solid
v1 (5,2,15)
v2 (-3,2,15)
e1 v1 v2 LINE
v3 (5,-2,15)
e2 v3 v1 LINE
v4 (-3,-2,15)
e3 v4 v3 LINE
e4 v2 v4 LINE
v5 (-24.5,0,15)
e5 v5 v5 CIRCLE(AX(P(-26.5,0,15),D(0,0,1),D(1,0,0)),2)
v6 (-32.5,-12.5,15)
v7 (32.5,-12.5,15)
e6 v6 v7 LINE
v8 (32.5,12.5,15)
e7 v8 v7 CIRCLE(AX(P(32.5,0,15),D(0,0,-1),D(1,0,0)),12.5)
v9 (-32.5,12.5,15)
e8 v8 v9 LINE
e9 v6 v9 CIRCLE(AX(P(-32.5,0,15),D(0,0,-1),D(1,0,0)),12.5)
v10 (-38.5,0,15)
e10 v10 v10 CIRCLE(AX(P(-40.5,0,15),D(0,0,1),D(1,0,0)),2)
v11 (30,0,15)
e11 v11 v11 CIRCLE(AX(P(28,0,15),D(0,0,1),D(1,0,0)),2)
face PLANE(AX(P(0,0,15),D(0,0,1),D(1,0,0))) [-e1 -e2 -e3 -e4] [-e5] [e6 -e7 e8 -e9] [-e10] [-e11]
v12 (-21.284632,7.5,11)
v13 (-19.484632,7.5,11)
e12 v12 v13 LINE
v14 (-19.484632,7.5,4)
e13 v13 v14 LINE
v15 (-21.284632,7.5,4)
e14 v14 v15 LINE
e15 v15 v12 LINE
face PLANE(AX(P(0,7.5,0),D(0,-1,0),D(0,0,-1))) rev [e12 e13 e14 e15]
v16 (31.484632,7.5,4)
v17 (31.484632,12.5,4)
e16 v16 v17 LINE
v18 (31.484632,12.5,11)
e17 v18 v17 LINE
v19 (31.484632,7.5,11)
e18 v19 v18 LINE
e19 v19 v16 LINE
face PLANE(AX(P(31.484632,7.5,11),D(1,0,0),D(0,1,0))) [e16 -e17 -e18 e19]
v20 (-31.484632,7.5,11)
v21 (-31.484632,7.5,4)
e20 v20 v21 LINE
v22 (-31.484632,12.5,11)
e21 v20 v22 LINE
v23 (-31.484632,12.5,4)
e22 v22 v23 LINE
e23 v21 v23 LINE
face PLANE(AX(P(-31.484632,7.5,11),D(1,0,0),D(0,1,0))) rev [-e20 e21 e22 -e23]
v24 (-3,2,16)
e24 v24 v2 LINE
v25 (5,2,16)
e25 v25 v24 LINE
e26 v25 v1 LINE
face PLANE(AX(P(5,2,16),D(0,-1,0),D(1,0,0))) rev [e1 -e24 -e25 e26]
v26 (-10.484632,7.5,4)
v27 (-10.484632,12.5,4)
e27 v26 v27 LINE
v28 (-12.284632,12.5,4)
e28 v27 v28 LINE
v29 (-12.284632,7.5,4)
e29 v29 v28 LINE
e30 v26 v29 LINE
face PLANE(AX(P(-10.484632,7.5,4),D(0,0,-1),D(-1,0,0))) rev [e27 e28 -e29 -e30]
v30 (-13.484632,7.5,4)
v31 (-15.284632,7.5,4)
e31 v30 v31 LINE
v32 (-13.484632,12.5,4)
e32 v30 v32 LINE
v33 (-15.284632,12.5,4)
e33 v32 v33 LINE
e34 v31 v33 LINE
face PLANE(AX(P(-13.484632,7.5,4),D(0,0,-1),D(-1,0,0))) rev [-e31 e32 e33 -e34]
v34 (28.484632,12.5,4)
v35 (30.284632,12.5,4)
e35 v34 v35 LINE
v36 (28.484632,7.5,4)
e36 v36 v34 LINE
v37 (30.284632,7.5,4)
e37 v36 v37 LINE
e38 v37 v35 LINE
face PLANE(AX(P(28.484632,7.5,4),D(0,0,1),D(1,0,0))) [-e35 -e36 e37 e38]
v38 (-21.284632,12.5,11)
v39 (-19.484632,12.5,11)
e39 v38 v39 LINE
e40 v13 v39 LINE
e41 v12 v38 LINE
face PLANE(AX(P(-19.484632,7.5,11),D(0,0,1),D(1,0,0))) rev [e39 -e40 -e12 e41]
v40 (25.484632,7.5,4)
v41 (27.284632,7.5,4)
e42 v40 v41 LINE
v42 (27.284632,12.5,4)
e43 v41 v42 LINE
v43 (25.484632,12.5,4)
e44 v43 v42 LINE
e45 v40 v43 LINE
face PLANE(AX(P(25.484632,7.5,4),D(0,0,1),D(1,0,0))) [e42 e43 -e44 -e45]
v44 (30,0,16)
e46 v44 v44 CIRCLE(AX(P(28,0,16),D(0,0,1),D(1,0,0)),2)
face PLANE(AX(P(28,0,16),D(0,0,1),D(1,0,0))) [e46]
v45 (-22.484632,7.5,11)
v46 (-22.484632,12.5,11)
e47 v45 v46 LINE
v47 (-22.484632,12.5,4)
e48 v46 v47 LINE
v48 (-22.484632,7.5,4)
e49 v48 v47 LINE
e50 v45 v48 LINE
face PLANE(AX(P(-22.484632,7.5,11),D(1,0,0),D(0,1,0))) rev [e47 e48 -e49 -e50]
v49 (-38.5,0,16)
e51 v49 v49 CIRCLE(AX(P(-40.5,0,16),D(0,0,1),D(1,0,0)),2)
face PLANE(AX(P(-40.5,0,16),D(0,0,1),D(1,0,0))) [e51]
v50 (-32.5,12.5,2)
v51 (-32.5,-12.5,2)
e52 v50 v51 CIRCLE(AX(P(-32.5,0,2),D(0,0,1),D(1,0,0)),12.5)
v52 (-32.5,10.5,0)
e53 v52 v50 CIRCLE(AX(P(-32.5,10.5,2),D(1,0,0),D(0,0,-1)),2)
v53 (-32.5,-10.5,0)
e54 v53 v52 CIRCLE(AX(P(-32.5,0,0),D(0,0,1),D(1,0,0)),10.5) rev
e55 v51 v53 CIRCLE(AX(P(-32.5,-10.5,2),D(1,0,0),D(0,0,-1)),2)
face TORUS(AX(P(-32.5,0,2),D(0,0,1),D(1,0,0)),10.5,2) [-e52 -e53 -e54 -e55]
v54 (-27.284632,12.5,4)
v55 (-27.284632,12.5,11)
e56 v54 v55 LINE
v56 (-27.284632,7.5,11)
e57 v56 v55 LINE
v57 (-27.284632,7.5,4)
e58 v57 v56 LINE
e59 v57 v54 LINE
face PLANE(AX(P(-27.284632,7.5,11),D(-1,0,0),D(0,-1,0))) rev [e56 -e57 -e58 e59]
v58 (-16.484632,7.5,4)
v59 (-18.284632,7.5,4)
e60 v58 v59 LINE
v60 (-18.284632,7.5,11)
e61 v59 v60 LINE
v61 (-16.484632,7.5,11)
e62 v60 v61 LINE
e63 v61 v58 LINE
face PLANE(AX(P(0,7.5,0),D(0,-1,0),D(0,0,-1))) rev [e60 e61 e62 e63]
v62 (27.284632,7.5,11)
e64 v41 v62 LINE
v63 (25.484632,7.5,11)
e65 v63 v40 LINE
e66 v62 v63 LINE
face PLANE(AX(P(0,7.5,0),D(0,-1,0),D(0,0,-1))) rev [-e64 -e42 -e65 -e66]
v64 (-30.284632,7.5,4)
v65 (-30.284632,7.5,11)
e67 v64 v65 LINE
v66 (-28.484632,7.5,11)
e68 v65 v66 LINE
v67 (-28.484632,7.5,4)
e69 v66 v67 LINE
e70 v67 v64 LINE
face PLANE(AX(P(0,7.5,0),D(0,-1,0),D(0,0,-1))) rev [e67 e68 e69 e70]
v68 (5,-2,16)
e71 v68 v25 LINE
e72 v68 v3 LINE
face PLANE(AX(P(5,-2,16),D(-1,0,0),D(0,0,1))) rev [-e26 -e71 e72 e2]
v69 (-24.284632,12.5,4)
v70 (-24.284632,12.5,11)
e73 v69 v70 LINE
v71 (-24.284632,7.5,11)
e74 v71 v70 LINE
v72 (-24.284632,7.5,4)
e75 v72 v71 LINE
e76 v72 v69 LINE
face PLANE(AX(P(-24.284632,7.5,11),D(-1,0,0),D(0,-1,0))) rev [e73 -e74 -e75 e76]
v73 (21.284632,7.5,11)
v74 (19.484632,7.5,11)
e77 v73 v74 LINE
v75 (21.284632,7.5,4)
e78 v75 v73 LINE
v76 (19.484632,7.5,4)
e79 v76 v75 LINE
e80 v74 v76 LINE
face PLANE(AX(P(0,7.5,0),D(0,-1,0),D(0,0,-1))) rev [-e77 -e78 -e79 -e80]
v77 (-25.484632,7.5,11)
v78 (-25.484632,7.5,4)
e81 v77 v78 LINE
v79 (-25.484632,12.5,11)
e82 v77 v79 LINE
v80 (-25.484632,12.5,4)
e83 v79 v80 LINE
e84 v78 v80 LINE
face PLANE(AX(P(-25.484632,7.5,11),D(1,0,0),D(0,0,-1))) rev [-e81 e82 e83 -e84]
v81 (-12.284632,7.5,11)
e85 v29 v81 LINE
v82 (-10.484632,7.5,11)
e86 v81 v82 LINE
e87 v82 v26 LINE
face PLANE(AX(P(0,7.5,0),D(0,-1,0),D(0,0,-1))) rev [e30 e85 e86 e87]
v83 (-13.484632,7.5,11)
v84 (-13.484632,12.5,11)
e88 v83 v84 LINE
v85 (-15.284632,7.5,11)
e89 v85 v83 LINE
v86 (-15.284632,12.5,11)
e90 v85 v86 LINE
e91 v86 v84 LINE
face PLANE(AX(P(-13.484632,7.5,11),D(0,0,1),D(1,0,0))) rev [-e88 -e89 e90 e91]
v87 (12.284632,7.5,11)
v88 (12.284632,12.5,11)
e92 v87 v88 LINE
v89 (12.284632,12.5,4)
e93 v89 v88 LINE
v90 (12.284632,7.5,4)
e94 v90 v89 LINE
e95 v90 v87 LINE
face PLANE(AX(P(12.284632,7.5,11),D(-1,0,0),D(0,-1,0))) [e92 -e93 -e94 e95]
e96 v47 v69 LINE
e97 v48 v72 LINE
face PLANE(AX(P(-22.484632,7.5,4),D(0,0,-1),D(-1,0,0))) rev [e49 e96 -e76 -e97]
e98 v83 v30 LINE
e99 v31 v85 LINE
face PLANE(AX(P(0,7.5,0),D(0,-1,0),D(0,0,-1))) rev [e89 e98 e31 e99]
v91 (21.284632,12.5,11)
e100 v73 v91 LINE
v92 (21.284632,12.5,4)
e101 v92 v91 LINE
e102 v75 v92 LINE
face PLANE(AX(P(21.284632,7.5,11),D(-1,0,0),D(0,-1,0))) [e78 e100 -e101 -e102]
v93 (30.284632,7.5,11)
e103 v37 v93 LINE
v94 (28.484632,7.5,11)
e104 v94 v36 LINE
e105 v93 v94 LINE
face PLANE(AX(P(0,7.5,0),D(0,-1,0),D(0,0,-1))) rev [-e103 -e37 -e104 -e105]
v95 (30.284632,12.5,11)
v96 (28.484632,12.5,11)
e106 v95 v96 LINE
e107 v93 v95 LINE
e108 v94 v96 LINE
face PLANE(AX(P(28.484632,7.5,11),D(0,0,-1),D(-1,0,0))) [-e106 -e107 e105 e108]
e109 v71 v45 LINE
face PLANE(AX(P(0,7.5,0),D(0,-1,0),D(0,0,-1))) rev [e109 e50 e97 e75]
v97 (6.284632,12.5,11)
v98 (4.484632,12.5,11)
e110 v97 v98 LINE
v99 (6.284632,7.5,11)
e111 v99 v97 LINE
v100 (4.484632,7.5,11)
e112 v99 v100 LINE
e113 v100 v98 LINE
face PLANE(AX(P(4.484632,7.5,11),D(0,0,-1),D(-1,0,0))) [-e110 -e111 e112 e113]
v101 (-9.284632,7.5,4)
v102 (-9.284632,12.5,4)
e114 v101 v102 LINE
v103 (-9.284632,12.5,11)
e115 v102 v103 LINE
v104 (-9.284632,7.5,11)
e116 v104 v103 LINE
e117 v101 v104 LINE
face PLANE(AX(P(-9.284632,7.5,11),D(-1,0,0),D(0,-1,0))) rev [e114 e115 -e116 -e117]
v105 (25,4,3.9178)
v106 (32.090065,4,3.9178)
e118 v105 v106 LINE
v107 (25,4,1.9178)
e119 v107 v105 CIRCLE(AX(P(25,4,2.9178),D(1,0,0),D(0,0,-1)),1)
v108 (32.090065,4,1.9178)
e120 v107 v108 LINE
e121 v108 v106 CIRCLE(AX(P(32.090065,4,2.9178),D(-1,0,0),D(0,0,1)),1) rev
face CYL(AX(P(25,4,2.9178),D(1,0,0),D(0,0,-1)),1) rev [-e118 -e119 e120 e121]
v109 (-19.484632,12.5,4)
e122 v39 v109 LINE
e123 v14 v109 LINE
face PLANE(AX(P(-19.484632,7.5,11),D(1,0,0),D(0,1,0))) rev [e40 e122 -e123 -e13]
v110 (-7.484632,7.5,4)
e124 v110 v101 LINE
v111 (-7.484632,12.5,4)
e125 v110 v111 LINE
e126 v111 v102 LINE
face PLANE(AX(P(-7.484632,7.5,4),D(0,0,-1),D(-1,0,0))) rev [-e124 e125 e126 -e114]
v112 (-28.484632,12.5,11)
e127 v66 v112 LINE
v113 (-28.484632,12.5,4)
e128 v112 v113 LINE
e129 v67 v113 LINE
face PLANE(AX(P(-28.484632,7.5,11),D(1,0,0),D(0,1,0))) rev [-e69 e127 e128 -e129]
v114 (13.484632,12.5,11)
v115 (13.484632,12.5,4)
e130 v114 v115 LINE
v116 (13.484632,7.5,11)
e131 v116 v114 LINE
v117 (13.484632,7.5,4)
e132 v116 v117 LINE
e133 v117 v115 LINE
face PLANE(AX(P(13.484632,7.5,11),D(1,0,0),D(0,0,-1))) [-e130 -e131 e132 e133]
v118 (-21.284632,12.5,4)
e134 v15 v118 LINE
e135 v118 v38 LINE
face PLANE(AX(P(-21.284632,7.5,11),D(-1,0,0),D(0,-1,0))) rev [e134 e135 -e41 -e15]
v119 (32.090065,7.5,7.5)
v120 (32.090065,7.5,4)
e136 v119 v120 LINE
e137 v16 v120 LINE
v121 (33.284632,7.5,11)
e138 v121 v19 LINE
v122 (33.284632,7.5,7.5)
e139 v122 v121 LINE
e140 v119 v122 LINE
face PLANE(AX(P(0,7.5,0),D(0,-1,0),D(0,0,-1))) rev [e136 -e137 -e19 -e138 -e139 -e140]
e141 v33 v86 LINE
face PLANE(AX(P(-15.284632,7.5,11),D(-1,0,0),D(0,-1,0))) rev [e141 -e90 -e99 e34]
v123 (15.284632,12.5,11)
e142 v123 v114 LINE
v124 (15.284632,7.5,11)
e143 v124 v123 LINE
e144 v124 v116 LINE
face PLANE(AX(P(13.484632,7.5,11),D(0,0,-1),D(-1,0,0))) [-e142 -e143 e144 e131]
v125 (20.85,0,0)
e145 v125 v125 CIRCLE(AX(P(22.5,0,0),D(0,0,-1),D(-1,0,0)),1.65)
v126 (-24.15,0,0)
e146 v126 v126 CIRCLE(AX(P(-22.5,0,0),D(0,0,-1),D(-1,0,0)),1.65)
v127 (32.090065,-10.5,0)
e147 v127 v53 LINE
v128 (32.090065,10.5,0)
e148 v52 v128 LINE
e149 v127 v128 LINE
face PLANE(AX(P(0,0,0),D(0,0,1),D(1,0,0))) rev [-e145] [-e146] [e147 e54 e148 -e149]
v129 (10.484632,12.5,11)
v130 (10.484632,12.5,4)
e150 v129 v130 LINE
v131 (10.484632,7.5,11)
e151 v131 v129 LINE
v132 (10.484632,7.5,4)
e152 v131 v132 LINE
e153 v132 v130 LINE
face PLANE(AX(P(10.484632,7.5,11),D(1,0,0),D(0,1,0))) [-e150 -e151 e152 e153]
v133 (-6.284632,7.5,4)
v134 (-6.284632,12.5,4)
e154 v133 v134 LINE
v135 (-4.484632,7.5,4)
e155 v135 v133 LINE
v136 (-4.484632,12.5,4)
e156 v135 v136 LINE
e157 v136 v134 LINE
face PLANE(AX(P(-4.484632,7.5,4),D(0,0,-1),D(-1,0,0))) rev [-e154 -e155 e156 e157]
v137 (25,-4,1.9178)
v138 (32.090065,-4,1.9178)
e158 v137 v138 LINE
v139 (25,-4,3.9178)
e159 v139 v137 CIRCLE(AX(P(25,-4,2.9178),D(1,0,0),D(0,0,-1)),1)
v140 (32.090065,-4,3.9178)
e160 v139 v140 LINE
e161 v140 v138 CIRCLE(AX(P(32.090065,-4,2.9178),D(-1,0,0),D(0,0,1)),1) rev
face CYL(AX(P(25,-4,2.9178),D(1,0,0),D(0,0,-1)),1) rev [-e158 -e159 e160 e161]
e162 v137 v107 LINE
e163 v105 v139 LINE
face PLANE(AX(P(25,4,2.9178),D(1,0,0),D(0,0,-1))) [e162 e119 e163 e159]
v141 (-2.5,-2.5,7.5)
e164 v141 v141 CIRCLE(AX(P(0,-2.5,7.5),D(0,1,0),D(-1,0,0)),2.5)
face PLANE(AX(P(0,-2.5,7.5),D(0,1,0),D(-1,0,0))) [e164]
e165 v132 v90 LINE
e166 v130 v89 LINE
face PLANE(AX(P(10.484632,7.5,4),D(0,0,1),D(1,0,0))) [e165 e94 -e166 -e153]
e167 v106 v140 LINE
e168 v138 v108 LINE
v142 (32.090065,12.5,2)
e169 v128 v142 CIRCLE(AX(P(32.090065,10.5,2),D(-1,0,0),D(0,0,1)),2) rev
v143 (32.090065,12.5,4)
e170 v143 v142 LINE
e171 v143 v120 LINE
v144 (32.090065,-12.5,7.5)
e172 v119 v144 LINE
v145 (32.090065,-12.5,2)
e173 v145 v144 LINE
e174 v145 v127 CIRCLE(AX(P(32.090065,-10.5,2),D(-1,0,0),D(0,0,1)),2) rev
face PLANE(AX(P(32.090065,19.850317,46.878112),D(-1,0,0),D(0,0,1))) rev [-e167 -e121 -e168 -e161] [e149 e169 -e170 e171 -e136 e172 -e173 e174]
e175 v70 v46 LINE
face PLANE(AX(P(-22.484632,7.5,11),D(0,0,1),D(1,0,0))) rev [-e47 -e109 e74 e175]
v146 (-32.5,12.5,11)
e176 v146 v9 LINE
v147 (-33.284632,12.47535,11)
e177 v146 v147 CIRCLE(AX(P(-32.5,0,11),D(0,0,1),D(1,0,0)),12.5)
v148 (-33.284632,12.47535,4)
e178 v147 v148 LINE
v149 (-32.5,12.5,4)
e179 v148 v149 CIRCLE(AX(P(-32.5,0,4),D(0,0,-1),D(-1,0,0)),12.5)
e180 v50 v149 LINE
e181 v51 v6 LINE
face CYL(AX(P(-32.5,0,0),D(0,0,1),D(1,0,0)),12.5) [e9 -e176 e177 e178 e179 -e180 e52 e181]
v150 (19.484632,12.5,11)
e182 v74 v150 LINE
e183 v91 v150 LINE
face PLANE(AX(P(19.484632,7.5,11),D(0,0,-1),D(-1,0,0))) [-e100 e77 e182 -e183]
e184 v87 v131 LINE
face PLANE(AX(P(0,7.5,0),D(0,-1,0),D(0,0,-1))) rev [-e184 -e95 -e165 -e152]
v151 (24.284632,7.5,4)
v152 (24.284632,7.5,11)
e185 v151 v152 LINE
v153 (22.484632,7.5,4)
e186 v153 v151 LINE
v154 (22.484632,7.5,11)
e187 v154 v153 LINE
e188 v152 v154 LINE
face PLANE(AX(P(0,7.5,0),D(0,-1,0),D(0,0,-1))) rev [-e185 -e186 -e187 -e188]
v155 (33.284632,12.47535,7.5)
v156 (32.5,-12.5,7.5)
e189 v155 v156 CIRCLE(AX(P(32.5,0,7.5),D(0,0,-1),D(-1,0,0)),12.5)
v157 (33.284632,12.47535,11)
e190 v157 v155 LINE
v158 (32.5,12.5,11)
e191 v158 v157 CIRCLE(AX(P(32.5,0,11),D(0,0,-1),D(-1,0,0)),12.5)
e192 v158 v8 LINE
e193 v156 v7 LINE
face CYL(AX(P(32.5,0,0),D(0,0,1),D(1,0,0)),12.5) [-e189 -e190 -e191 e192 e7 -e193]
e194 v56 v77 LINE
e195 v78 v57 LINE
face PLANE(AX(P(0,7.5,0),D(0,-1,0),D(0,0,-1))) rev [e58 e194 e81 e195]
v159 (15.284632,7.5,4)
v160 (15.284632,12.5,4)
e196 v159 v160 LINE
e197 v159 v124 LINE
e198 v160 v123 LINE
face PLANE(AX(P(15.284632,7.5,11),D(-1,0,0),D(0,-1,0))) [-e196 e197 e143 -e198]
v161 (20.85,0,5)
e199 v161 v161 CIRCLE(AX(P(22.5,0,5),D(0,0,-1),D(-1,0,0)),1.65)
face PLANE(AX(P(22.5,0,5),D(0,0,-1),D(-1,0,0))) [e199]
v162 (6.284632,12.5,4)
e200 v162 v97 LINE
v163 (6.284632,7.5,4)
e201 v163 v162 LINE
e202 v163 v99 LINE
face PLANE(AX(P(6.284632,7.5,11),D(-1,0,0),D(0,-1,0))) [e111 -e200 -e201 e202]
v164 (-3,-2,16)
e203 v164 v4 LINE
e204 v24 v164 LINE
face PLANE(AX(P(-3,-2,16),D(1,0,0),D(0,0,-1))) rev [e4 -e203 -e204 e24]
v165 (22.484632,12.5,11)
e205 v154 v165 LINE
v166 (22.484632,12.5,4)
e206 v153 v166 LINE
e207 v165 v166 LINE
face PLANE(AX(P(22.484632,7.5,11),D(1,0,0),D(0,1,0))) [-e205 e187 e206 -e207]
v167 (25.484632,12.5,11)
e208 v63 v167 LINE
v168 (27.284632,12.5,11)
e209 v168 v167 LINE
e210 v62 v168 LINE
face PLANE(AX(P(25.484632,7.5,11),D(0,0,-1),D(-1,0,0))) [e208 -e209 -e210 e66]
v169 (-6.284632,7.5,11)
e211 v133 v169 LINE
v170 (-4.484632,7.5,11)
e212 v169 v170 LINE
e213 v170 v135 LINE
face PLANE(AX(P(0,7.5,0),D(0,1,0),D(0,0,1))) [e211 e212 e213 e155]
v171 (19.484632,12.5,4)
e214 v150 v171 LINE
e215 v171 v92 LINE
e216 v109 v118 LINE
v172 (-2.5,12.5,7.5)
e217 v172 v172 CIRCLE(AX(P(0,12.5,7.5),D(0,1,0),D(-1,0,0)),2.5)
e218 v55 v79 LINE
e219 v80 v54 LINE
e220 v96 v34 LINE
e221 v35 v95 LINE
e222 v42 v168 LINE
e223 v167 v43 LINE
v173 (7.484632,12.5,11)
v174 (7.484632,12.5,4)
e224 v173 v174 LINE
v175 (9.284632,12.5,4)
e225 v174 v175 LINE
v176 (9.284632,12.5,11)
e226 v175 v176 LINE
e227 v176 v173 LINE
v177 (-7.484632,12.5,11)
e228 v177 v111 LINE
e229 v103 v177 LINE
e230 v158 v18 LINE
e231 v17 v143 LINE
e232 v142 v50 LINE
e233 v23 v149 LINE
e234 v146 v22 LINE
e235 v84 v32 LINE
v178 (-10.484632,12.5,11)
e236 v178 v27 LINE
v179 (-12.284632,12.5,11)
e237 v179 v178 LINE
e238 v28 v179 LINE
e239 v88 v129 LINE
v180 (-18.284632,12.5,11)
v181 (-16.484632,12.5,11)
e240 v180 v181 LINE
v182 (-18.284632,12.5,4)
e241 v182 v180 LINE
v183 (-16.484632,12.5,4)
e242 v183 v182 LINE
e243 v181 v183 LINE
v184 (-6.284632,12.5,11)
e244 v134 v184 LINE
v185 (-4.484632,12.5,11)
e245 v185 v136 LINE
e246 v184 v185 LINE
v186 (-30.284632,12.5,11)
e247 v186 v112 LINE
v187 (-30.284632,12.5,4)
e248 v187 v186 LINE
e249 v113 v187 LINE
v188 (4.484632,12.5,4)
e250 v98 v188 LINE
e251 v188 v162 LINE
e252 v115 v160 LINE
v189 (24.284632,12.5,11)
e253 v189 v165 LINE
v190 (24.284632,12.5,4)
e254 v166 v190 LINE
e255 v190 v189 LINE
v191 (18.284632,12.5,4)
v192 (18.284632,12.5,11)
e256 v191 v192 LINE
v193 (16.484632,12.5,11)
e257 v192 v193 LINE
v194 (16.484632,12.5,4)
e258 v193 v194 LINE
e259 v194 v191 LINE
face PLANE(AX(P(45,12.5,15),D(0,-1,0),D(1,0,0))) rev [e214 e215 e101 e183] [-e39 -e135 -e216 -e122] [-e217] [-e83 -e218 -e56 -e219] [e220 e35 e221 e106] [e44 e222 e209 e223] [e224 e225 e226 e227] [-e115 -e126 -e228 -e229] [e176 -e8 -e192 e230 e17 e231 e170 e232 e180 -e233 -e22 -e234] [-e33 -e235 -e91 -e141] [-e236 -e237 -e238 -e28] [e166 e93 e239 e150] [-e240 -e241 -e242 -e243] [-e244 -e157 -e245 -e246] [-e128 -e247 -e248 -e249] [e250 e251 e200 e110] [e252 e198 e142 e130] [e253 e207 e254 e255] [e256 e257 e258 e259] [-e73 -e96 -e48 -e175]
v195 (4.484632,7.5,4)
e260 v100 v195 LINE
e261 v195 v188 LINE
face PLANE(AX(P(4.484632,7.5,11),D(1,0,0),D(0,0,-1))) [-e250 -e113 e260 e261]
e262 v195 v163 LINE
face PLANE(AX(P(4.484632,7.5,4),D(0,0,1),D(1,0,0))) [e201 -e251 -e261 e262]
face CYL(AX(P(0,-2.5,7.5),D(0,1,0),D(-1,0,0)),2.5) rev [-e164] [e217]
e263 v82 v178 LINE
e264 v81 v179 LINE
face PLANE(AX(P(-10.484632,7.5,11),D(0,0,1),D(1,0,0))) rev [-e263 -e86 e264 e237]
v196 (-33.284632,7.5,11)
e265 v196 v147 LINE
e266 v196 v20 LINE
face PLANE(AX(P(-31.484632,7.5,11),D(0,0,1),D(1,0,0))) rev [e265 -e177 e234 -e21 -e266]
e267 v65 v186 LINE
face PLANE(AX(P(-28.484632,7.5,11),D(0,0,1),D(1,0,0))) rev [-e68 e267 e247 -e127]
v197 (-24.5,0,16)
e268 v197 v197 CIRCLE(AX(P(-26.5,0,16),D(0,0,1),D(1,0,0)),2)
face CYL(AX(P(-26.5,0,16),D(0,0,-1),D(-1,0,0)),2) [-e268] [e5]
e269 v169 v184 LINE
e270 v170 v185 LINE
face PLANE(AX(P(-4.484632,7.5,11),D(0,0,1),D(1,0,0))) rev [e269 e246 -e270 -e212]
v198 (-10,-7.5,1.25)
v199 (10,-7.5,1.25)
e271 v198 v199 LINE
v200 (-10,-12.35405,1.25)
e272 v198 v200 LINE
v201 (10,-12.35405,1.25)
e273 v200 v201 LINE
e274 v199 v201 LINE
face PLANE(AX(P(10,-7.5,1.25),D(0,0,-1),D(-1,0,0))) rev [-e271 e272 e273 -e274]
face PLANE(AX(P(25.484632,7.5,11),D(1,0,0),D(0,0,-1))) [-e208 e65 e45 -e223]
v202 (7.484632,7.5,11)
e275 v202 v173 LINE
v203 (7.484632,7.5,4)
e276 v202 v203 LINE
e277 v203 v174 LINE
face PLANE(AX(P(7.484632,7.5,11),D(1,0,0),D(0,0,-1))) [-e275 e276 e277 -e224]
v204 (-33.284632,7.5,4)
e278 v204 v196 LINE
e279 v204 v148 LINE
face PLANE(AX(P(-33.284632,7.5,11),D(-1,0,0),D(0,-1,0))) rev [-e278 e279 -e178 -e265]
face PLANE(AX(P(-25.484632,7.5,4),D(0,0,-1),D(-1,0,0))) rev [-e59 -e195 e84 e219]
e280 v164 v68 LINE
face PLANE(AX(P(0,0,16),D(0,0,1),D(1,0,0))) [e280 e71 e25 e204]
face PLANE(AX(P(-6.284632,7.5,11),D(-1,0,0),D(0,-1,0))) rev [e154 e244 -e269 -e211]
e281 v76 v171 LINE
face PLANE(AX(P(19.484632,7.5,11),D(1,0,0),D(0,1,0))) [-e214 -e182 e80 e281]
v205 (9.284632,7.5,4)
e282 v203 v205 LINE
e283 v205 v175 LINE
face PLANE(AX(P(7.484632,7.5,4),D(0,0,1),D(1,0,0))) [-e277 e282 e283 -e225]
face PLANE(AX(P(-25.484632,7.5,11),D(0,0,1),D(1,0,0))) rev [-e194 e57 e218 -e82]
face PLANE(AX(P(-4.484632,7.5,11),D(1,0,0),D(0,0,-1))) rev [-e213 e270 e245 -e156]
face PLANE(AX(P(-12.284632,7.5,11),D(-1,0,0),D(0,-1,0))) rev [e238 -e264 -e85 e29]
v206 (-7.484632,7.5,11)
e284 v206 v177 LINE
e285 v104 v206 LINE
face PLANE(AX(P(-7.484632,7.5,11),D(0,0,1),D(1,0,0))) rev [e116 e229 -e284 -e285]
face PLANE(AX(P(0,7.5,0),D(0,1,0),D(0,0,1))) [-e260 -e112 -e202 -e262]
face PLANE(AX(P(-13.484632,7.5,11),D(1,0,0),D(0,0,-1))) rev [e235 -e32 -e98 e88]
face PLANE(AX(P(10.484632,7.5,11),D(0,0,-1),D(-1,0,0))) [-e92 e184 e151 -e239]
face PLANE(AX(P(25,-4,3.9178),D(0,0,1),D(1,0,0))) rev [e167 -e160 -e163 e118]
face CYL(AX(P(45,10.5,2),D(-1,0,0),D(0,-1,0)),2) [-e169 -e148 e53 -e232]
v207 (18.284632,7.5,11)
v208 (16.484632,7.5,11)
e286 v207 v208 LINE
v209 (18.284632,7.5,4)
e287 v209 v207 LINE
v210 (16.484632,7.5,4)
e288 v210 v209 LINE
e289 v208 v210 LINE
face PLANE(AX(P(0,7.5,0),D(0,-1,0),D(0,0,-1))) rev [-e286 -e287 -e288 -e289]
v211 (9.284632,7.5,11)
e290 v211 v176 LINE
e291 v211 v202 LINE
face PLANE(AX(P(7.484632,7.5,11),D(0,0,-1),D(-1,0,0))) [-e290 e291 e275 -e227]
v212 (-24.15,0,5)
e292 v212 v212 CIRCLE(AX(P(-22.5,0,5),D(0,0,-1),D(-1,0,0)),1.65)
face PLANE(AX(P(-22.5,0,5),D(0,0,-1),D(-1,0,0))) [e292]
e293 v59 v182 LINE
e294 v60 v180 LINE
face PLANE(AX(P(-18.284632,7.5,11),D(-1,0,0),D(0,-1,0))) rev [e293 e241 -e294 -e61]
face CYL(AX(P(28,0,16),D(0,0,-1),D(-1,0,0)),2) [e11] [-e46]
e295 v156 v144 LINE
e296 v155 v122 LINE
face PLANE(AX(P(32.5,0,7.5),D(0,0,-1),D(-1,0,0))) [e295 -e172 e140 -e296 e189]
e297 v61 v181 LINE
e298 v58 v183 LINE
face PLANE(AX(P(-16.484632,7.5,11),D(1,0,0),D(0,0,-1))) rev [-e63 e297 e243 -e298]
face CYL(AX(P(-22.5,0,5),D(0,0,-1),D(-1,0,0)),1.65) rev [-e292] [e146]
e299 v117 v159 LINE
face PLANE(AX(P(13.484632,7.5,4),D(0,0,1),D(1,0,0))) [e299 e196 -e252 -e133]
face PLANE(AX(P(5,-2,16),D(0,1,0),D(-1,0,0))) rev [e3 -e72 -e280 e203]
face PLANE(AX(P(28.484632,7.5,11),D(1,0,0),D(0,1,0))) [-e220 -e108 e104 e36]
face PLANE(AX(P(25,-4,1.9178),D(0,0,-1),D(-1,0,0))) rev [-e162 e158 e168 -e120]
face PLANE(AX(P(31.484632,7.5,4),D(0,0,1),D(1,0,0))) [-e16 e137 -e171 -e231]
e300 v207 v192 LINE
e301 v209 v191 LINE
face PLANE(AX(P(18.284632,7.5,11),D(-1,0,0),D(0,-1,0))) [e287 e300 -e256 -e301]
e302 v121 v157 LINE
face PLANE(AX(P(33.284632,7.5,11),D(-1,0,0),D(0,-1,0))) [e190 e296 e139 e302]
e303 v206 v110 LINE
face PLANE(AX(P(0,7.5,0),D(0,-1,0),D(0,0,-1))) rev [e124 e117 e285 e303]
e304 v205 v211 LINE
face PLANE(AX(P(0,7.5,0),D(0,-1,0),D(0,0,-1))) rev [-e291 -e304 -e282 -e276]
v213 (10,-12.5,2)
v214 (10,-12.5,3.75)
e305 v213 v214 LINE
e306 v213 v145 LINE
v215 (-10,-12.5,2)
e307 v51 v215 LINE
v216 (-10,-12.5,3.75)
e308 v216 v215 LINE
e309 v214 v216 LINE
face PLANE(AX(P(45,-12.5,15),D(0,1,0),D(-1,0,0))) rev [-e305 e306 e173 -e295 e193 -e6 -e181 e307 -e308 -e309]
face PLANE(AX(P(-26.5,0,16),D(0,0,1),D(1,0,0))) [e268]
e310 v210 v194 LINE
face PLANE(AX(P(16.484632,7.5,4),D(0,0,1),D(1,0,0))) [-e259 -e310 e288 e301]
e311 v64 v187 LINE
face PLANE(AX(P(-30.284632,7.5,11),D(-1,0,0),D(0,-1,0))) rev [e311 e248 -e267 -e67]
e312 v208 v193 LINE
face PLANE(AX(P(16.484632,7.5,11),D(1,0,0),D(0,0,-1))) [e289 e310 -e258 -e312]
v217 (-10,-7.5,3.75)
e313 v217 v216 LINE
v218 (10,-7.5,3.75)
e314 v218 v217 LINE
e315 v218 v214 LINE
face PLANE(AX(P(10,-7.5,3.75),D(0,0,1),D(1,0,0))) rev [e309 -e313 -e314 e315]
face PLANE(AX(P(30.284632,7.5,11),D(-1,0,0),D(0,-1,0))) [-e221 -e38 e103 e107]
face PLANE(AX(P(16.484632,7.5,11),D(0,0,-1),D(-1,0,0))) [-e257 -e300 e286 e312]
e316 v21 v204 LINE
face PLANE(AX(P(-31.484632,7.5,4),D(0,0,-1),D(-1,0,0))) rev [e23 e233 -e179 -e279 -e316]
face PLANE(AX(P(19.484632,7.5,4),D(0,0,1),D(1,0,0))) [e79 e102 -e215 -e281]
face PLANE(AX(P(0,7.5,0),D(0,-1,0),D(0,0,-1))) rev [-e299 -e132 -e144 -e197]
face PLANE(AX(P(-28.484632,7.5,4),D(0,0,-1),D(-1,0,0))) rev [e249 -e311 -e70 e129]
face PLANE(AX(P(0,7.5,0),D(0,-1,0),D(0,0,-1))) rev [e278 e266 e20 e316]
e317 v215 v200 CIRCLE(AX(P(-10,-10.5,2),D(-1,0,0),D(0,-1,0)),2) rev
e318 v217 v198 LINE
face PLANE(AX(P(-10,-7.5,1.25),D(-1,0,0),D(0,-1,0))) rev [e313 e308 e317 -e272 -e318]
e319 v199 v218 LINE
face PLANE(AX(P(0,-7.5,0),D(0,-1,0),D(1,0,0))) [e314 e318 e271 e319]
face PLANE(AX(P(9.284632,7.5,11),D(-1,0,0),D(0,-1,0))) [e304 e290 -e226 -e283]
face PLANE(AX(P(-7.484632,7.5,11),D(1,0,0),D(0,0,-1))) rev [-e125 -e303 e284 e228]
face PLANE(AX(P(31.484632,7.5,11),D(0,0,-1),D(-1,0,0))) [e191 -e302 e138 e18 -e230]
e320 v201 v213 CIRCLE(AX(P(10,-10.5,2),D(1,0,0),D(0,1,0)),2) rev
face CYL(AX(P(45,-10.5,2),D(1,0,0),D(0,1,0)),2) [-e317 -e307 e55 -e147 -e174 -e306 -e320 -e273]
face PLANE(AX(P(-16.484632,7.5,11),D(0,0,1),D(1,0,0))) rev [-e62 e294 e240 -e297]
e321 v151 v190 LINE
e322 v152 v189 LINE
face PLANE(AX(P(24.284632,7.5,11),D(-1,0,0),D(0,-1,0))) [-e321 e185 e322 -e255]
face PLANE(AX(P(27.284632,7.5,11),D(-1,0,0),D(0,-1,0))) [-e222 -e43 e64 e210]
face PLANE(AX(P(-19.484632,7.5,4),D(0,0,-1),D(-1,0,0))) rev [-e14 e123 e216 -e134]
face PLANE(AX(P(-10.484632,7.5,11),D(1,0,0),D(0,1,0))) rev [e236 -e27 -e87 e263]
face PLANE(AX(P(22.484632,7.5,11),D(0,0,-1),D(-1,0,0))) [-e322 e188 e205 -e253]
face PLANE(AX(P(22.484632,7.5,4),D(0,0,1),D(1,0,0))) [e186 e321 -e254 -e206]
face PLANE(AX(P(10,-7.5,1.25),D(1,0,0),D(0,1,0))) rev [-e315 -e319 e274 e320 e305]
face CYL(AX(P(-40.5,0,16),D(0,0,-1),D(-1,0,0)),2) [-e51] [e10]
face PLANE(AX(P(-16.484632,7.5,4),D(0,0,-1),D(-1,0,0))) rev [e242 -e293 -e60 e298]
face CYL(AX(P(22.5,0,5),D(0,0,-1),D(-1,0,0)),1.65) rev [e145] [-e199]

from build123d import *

# Parameters (mm, degrees)
SKETCH_1_W           = 90
SKETCH_1_H           = 25
EXTRUDE_1_DEPTH      = 15
CUT_EXTRUDE_1_DEPTH  = 15
SKETCH_3_R           = 2.5
CUT_EXTRUDE_2_DEPTH  = 15
SKETCH_4_W           = 1.8
SKETCH_4_H           = 7
CUT_EXTRUDE_3_DEPTH  = 5
SKETCH_5_R           = 1.65
CUT_EXTRUDE_4_DEPTH  = 5
SKETCH_6_W           = 20
SKETCH_6_H           = 2.5
CUT_EXTRUDE_5_DEPTH  = 5
CUT_EXTRUDE_7_DEPTH  = 7.5
CUT_EXTRUDE_8_DEPTH  = 7.5
SKETCH_9_R           = 2
SKETCH_9_W           = 8
SKETCH_9_H           = 4
EXTRUDE_2_DEPTH      = 1
FILLET_1_R           = 2
CUT_EXTRUDE_10_REACH = 51.369
SKETCH_15_W          = 17.204453114
SKETCH_15_H          = 35.420932882


with BuildPart() as part:
    # 草图1 → 凸台-拉伸1 (new body)
    with BuildSketch(Plane.XY):
        Rectangle(SKETCH_1_W, SKETCH_1_H)
    extrude(amount=EXTRUDE_1_DEPTH)

    # 草图2 → 切除-拉伸1 (cut)
    with BuildSketch(Plane.XY.offset(15)):
        with BuildLine():
            Line((-32.5, 12.5), (-61.464378833, 12.5))
            Line((-61.464378833, 12.5), (-61.464378833, -12.5))
            Line((-61.464378833, -12.5), (-32.5, -12.5))
            ThreePointArc((-32.5, -12.5), (-45, 0), (-32.5, 12.5))
        make_face()
        with BuildLine():
            Line((32.5, 12.5), (60.882590951, 12.5))
            Line((60.882590951, 12.5), (60.882590951, -12.5))
            Line((60.882590951, -12.5), (32.5, -12.5))
            ThreePointArc((32.5, -12.5), (45, 0), (32.5, 12.5))
        make_face()
    extrude(amount=-CUT_EXTRUDE_1_DEPTH, mode=Mode.SUBTRACT)

    # 草图3 → 切除-拉伸2 (cut)
    with BuildSketch(Plane(origin=(0, 12.5, 0), x_dir=(1, 0, 0), z_dir=(0, 1, 0))):
        with Locations(Location((0, -7.5, 0), (0, 0, 180))):
            Circle(SKETCH_3_R)
    extrude(amount=-CUT_EXTRUDE_2_DEPTH, mode=Mode.SUBTRACT)

    # 草图4 → 切除-拉伸3 (cut)
    with BuildSketch(Plane(origin=(0, 12.5, 0), x_dir=(1, 0, 0), z_dir=(0, 1, 0))):
        with Locations((-8.384632086, -7.5)):
            Rectangle(SKETCH_4_W, SKETCH_4_H)
        with Locations((-5.384632086, -7.5)):
            Rectangle(SKETCH_4_W, SKETCH_4_H)
        with Locations((-11.384632086, -7.5)):
            Rectangle(SKETCH_4_W, SKETCH_4_H)
        with Locations((-14.384632086, -7.5)):
            Rectangle(SKETCH_4_W, SKETCH_4_H)
        with Locations((-17.384632086, -7.5)):
            Rectangle(SKETCH_4_W, SKETCH_4_H)
        with Locations((-20.384632086, -7.5)):
            Rectangle(SKETCH_4_W, SKETCH_4_H)
        with Locations((-23.384632086, -7.5)):
            Rectangle(SKETCH_4_W, SKETCH_4_H)
        with Locations((-26.384632086, -7.5)):
            Rectangle(SKETCH_4_W, SKETCH_4_H)
        with Locations((-29.384632086, -7.5)):
            Rectangle(SKETCH_4_W, SKETCH_4_H)
        with Locations((-32.384632086, -7.5)):
            Rectangle(SKETCH_4_W, SKETCH_4_H)
    cut_extrude_3 = extrude(amount=-CUT_EXTRUDE_3_DEPTH, mode=Mode.SUBTRACT)

    # 镜向1: 切除-拉伸3 across plane
    add(cut_extrude_3.mirror(Plane(origin=(0, 0, 0), x_dir=(0, 0, 1), z_dir=(1, 0, 0))), mode=Mode.SUBTRACT)

    # 草图5 → 切除-拉伸4 (cut)
    with BuildSketch(Plane(origin=(0, 0, 0), x_dir=(-1, 0, 0), z_dir=(0, 0, -1))):
        with Locations((-22.5, 0)):
            Circle(SKETCH_5_R)
        with Locations((22.5, 0)):
            Circle(SKETCH_5_R)
    extrude(amount=-CUT_EXTRUDE_4_DEPTH, mode=Mode.SUBTRACT)

    # 草图6 → 切除-拉伸5 (cut)
    with BuildSketch(Plane.XZ.offset(12.5)):
        with Locations((0, 2.5)):
            Rectangle(SKETCH_6_W, SKETCH_6_H)
    extrude(amount=-CUT_EXTRUDE_5_DEPTH, mode=Mode.SUBTRACT)

    # 草图7 → 切除-拉伸7 (cut)
    with BuildSketch(Plane(origin=(0, 0, 0), x_dir=(-1, 0, 0), z_dir=(0, 0, -1))):
        with BuildLine():
            Line((-32.5, 9), (-32.5, -9))
            ThreePointArc((-32.5, -9), (-41.5, 0), (-32.5, 9))
        make_face()
    extrude(amount=-CUT_EXTRUDE_7_DEPTH, mode=Mode.SUBTRACT)

    # 草图8 → 切除-拉伸8 (cut)
    with BuildSketch(Plane(origin=(32.5, 0, 0), x_dir=(0, 0, -1), z_dir=(1, 0, 0))):
        with BuildLine():
            Line((-1.91780044, -4), (-1.91780044, 4))
            ThreePointArc((-1.91780044, 4), (-2.91780044, 5), (-3.91780044, 4))
            Line((-3.91780044, 4), (-3.91780044, -4))
            ThreePointArc((-3.91780044, -4), (-2.91780044, -5), (-1.91780044, -4))
        make_face()
    extrude(amount=-CUT_EXTRUDE_8_DEPTH, mode=Mode.SUBTRACT)

    # 草图9 → 凸台-拉伸2 (add)
    with BuildSketch(Plane.XY.offset(15)):
        with Locations((28, 0)):
            Circle(SKETCH_9_R)
        with Locations((-26.5, 0)):
            Circle(SKETCH_9_R)
        with Locations((-40.5, 0)):
            Circle(SKETCH_9_R)
        with Locations((1, 0)):
            Rectangle(SKETCH_9_W, SKETCH_9_H)
    extrude(amount=EXTRUDE_2_DEPTH)

    # 圆角1
    # the kernel refuses this fillet: 2 mm, written as the material it takes off along each edge
    with BuildSketch(Plane(origin=(32.5, -12.5, 0), x_dir=(0, 0, 1), z_dir=(-1, 0, 0))) as fillet_1_piece_1:
        with BuildLine():
            CenterArc((FILLET_1_R, FILLET_1_R), FILLET_1_R, 180, 90)
            Line((0, FILLET_1_R), (0, 0))
            Line((0, 0), (FILLET_1_R, 0))
        make_face()
    extrude(amount=65, mode=Mode.SUBTRACT)
    with BuildSketch(Plane(origin=(-32.5, 0, 0), x_dir=(0, -1, 0), z_dir=(1, 0, 0))) as fillet_1_piece_2:
        with BuildLine():
            CenterArc((12.5 - FILLET_1_R, -FILLET_1_R), FILLET_1_R, 0, 90)
            Line((12.5, -FILLET_1_R), (12.5, 0))
            Line((12.5, 0), (12.5 - FILLET_1_R, 0))
        make_face()
    revolve(axis=Axis((-32.5, 0, 0), (0, 0, -1)), revolution_arc=180, mode=Mode.SUBTRACT)
    with BuildSketch(Plane(origin=(-32.5, 12.5, 0), x_dir=(0, -1, 0), z_dir=(1, 0, 0))) as fillet_1_piece_3:
        with BuildLine():
            CenterArc((FILLET_1_R, -FILLET_1_R), FILLET_1_R, 90, 90)
            Line((0, -FILLET_1_R), (0, 0))
            Line((0, 0), (FILLET_1_R, 0))
        make_face()
    extrude(amount=65, mode=Mode.SUBTRACT)
    with BuildSketch(Plane(origin=(32.5, 0, 0), x_dir=(0, 1, 0), z_dir=(-1, 0, 0))) as fillet_1_piece_4:
        with BuildLine():
            CenterArc((12.5 - FILLET_1_R, -FILLET_1_R), FILLET_1_R, 0, 90)
            Line((12.5, -FILLET_1_R), (12.5, 0))
            Line((12.5, 0), (12.5 - FILLET_1_R, 0))
        make_face()
    revolve(axis=Axis((32.5, 0, 0), (0, 0, -1)), revolution_arc=180, mode=Mode.SUBTRACT)

    # 切除-拉伸10: up to this face of the body (flat: up to its plane)
    cut_extrude_10_end = Plane(part.part.faces().sort_by_distance((36.351487084, -0.076382797, 7.5))[0])
    # 草图15 → 切除-拉伸10 (cut, up to the picked face)
    with BuildSketch(Plane(origin=(0, 0, 0), x_dir=(-1, 0, 0), z_dir=(0, 0, -1)), mode=Mode.PRIVATE) as cut_extrude_10_sk1:
        with Locations((-40.69229177, 2.139850544)):
            Rectangle(SKETCH_15_W, SKETCH_15_H)
    cut_extrude_10_tool1 = split(extrude(cut_extrude_10_sk1.sketch, amount=-CUT_EXTRUDE_10_REACH, mode=Mode.PRIVATE), bisect_by=cut_extrude_10_end, keep=Keep.BOTH, mode=Mode.PRIVATE)
    add(cut_extrude_10_tool1.solids().sort_by(Axis((40.692292, 2.139851, 0), (0, 0, 1)))[0], mode=Mode.SUBTRACT)


solid = part.part
